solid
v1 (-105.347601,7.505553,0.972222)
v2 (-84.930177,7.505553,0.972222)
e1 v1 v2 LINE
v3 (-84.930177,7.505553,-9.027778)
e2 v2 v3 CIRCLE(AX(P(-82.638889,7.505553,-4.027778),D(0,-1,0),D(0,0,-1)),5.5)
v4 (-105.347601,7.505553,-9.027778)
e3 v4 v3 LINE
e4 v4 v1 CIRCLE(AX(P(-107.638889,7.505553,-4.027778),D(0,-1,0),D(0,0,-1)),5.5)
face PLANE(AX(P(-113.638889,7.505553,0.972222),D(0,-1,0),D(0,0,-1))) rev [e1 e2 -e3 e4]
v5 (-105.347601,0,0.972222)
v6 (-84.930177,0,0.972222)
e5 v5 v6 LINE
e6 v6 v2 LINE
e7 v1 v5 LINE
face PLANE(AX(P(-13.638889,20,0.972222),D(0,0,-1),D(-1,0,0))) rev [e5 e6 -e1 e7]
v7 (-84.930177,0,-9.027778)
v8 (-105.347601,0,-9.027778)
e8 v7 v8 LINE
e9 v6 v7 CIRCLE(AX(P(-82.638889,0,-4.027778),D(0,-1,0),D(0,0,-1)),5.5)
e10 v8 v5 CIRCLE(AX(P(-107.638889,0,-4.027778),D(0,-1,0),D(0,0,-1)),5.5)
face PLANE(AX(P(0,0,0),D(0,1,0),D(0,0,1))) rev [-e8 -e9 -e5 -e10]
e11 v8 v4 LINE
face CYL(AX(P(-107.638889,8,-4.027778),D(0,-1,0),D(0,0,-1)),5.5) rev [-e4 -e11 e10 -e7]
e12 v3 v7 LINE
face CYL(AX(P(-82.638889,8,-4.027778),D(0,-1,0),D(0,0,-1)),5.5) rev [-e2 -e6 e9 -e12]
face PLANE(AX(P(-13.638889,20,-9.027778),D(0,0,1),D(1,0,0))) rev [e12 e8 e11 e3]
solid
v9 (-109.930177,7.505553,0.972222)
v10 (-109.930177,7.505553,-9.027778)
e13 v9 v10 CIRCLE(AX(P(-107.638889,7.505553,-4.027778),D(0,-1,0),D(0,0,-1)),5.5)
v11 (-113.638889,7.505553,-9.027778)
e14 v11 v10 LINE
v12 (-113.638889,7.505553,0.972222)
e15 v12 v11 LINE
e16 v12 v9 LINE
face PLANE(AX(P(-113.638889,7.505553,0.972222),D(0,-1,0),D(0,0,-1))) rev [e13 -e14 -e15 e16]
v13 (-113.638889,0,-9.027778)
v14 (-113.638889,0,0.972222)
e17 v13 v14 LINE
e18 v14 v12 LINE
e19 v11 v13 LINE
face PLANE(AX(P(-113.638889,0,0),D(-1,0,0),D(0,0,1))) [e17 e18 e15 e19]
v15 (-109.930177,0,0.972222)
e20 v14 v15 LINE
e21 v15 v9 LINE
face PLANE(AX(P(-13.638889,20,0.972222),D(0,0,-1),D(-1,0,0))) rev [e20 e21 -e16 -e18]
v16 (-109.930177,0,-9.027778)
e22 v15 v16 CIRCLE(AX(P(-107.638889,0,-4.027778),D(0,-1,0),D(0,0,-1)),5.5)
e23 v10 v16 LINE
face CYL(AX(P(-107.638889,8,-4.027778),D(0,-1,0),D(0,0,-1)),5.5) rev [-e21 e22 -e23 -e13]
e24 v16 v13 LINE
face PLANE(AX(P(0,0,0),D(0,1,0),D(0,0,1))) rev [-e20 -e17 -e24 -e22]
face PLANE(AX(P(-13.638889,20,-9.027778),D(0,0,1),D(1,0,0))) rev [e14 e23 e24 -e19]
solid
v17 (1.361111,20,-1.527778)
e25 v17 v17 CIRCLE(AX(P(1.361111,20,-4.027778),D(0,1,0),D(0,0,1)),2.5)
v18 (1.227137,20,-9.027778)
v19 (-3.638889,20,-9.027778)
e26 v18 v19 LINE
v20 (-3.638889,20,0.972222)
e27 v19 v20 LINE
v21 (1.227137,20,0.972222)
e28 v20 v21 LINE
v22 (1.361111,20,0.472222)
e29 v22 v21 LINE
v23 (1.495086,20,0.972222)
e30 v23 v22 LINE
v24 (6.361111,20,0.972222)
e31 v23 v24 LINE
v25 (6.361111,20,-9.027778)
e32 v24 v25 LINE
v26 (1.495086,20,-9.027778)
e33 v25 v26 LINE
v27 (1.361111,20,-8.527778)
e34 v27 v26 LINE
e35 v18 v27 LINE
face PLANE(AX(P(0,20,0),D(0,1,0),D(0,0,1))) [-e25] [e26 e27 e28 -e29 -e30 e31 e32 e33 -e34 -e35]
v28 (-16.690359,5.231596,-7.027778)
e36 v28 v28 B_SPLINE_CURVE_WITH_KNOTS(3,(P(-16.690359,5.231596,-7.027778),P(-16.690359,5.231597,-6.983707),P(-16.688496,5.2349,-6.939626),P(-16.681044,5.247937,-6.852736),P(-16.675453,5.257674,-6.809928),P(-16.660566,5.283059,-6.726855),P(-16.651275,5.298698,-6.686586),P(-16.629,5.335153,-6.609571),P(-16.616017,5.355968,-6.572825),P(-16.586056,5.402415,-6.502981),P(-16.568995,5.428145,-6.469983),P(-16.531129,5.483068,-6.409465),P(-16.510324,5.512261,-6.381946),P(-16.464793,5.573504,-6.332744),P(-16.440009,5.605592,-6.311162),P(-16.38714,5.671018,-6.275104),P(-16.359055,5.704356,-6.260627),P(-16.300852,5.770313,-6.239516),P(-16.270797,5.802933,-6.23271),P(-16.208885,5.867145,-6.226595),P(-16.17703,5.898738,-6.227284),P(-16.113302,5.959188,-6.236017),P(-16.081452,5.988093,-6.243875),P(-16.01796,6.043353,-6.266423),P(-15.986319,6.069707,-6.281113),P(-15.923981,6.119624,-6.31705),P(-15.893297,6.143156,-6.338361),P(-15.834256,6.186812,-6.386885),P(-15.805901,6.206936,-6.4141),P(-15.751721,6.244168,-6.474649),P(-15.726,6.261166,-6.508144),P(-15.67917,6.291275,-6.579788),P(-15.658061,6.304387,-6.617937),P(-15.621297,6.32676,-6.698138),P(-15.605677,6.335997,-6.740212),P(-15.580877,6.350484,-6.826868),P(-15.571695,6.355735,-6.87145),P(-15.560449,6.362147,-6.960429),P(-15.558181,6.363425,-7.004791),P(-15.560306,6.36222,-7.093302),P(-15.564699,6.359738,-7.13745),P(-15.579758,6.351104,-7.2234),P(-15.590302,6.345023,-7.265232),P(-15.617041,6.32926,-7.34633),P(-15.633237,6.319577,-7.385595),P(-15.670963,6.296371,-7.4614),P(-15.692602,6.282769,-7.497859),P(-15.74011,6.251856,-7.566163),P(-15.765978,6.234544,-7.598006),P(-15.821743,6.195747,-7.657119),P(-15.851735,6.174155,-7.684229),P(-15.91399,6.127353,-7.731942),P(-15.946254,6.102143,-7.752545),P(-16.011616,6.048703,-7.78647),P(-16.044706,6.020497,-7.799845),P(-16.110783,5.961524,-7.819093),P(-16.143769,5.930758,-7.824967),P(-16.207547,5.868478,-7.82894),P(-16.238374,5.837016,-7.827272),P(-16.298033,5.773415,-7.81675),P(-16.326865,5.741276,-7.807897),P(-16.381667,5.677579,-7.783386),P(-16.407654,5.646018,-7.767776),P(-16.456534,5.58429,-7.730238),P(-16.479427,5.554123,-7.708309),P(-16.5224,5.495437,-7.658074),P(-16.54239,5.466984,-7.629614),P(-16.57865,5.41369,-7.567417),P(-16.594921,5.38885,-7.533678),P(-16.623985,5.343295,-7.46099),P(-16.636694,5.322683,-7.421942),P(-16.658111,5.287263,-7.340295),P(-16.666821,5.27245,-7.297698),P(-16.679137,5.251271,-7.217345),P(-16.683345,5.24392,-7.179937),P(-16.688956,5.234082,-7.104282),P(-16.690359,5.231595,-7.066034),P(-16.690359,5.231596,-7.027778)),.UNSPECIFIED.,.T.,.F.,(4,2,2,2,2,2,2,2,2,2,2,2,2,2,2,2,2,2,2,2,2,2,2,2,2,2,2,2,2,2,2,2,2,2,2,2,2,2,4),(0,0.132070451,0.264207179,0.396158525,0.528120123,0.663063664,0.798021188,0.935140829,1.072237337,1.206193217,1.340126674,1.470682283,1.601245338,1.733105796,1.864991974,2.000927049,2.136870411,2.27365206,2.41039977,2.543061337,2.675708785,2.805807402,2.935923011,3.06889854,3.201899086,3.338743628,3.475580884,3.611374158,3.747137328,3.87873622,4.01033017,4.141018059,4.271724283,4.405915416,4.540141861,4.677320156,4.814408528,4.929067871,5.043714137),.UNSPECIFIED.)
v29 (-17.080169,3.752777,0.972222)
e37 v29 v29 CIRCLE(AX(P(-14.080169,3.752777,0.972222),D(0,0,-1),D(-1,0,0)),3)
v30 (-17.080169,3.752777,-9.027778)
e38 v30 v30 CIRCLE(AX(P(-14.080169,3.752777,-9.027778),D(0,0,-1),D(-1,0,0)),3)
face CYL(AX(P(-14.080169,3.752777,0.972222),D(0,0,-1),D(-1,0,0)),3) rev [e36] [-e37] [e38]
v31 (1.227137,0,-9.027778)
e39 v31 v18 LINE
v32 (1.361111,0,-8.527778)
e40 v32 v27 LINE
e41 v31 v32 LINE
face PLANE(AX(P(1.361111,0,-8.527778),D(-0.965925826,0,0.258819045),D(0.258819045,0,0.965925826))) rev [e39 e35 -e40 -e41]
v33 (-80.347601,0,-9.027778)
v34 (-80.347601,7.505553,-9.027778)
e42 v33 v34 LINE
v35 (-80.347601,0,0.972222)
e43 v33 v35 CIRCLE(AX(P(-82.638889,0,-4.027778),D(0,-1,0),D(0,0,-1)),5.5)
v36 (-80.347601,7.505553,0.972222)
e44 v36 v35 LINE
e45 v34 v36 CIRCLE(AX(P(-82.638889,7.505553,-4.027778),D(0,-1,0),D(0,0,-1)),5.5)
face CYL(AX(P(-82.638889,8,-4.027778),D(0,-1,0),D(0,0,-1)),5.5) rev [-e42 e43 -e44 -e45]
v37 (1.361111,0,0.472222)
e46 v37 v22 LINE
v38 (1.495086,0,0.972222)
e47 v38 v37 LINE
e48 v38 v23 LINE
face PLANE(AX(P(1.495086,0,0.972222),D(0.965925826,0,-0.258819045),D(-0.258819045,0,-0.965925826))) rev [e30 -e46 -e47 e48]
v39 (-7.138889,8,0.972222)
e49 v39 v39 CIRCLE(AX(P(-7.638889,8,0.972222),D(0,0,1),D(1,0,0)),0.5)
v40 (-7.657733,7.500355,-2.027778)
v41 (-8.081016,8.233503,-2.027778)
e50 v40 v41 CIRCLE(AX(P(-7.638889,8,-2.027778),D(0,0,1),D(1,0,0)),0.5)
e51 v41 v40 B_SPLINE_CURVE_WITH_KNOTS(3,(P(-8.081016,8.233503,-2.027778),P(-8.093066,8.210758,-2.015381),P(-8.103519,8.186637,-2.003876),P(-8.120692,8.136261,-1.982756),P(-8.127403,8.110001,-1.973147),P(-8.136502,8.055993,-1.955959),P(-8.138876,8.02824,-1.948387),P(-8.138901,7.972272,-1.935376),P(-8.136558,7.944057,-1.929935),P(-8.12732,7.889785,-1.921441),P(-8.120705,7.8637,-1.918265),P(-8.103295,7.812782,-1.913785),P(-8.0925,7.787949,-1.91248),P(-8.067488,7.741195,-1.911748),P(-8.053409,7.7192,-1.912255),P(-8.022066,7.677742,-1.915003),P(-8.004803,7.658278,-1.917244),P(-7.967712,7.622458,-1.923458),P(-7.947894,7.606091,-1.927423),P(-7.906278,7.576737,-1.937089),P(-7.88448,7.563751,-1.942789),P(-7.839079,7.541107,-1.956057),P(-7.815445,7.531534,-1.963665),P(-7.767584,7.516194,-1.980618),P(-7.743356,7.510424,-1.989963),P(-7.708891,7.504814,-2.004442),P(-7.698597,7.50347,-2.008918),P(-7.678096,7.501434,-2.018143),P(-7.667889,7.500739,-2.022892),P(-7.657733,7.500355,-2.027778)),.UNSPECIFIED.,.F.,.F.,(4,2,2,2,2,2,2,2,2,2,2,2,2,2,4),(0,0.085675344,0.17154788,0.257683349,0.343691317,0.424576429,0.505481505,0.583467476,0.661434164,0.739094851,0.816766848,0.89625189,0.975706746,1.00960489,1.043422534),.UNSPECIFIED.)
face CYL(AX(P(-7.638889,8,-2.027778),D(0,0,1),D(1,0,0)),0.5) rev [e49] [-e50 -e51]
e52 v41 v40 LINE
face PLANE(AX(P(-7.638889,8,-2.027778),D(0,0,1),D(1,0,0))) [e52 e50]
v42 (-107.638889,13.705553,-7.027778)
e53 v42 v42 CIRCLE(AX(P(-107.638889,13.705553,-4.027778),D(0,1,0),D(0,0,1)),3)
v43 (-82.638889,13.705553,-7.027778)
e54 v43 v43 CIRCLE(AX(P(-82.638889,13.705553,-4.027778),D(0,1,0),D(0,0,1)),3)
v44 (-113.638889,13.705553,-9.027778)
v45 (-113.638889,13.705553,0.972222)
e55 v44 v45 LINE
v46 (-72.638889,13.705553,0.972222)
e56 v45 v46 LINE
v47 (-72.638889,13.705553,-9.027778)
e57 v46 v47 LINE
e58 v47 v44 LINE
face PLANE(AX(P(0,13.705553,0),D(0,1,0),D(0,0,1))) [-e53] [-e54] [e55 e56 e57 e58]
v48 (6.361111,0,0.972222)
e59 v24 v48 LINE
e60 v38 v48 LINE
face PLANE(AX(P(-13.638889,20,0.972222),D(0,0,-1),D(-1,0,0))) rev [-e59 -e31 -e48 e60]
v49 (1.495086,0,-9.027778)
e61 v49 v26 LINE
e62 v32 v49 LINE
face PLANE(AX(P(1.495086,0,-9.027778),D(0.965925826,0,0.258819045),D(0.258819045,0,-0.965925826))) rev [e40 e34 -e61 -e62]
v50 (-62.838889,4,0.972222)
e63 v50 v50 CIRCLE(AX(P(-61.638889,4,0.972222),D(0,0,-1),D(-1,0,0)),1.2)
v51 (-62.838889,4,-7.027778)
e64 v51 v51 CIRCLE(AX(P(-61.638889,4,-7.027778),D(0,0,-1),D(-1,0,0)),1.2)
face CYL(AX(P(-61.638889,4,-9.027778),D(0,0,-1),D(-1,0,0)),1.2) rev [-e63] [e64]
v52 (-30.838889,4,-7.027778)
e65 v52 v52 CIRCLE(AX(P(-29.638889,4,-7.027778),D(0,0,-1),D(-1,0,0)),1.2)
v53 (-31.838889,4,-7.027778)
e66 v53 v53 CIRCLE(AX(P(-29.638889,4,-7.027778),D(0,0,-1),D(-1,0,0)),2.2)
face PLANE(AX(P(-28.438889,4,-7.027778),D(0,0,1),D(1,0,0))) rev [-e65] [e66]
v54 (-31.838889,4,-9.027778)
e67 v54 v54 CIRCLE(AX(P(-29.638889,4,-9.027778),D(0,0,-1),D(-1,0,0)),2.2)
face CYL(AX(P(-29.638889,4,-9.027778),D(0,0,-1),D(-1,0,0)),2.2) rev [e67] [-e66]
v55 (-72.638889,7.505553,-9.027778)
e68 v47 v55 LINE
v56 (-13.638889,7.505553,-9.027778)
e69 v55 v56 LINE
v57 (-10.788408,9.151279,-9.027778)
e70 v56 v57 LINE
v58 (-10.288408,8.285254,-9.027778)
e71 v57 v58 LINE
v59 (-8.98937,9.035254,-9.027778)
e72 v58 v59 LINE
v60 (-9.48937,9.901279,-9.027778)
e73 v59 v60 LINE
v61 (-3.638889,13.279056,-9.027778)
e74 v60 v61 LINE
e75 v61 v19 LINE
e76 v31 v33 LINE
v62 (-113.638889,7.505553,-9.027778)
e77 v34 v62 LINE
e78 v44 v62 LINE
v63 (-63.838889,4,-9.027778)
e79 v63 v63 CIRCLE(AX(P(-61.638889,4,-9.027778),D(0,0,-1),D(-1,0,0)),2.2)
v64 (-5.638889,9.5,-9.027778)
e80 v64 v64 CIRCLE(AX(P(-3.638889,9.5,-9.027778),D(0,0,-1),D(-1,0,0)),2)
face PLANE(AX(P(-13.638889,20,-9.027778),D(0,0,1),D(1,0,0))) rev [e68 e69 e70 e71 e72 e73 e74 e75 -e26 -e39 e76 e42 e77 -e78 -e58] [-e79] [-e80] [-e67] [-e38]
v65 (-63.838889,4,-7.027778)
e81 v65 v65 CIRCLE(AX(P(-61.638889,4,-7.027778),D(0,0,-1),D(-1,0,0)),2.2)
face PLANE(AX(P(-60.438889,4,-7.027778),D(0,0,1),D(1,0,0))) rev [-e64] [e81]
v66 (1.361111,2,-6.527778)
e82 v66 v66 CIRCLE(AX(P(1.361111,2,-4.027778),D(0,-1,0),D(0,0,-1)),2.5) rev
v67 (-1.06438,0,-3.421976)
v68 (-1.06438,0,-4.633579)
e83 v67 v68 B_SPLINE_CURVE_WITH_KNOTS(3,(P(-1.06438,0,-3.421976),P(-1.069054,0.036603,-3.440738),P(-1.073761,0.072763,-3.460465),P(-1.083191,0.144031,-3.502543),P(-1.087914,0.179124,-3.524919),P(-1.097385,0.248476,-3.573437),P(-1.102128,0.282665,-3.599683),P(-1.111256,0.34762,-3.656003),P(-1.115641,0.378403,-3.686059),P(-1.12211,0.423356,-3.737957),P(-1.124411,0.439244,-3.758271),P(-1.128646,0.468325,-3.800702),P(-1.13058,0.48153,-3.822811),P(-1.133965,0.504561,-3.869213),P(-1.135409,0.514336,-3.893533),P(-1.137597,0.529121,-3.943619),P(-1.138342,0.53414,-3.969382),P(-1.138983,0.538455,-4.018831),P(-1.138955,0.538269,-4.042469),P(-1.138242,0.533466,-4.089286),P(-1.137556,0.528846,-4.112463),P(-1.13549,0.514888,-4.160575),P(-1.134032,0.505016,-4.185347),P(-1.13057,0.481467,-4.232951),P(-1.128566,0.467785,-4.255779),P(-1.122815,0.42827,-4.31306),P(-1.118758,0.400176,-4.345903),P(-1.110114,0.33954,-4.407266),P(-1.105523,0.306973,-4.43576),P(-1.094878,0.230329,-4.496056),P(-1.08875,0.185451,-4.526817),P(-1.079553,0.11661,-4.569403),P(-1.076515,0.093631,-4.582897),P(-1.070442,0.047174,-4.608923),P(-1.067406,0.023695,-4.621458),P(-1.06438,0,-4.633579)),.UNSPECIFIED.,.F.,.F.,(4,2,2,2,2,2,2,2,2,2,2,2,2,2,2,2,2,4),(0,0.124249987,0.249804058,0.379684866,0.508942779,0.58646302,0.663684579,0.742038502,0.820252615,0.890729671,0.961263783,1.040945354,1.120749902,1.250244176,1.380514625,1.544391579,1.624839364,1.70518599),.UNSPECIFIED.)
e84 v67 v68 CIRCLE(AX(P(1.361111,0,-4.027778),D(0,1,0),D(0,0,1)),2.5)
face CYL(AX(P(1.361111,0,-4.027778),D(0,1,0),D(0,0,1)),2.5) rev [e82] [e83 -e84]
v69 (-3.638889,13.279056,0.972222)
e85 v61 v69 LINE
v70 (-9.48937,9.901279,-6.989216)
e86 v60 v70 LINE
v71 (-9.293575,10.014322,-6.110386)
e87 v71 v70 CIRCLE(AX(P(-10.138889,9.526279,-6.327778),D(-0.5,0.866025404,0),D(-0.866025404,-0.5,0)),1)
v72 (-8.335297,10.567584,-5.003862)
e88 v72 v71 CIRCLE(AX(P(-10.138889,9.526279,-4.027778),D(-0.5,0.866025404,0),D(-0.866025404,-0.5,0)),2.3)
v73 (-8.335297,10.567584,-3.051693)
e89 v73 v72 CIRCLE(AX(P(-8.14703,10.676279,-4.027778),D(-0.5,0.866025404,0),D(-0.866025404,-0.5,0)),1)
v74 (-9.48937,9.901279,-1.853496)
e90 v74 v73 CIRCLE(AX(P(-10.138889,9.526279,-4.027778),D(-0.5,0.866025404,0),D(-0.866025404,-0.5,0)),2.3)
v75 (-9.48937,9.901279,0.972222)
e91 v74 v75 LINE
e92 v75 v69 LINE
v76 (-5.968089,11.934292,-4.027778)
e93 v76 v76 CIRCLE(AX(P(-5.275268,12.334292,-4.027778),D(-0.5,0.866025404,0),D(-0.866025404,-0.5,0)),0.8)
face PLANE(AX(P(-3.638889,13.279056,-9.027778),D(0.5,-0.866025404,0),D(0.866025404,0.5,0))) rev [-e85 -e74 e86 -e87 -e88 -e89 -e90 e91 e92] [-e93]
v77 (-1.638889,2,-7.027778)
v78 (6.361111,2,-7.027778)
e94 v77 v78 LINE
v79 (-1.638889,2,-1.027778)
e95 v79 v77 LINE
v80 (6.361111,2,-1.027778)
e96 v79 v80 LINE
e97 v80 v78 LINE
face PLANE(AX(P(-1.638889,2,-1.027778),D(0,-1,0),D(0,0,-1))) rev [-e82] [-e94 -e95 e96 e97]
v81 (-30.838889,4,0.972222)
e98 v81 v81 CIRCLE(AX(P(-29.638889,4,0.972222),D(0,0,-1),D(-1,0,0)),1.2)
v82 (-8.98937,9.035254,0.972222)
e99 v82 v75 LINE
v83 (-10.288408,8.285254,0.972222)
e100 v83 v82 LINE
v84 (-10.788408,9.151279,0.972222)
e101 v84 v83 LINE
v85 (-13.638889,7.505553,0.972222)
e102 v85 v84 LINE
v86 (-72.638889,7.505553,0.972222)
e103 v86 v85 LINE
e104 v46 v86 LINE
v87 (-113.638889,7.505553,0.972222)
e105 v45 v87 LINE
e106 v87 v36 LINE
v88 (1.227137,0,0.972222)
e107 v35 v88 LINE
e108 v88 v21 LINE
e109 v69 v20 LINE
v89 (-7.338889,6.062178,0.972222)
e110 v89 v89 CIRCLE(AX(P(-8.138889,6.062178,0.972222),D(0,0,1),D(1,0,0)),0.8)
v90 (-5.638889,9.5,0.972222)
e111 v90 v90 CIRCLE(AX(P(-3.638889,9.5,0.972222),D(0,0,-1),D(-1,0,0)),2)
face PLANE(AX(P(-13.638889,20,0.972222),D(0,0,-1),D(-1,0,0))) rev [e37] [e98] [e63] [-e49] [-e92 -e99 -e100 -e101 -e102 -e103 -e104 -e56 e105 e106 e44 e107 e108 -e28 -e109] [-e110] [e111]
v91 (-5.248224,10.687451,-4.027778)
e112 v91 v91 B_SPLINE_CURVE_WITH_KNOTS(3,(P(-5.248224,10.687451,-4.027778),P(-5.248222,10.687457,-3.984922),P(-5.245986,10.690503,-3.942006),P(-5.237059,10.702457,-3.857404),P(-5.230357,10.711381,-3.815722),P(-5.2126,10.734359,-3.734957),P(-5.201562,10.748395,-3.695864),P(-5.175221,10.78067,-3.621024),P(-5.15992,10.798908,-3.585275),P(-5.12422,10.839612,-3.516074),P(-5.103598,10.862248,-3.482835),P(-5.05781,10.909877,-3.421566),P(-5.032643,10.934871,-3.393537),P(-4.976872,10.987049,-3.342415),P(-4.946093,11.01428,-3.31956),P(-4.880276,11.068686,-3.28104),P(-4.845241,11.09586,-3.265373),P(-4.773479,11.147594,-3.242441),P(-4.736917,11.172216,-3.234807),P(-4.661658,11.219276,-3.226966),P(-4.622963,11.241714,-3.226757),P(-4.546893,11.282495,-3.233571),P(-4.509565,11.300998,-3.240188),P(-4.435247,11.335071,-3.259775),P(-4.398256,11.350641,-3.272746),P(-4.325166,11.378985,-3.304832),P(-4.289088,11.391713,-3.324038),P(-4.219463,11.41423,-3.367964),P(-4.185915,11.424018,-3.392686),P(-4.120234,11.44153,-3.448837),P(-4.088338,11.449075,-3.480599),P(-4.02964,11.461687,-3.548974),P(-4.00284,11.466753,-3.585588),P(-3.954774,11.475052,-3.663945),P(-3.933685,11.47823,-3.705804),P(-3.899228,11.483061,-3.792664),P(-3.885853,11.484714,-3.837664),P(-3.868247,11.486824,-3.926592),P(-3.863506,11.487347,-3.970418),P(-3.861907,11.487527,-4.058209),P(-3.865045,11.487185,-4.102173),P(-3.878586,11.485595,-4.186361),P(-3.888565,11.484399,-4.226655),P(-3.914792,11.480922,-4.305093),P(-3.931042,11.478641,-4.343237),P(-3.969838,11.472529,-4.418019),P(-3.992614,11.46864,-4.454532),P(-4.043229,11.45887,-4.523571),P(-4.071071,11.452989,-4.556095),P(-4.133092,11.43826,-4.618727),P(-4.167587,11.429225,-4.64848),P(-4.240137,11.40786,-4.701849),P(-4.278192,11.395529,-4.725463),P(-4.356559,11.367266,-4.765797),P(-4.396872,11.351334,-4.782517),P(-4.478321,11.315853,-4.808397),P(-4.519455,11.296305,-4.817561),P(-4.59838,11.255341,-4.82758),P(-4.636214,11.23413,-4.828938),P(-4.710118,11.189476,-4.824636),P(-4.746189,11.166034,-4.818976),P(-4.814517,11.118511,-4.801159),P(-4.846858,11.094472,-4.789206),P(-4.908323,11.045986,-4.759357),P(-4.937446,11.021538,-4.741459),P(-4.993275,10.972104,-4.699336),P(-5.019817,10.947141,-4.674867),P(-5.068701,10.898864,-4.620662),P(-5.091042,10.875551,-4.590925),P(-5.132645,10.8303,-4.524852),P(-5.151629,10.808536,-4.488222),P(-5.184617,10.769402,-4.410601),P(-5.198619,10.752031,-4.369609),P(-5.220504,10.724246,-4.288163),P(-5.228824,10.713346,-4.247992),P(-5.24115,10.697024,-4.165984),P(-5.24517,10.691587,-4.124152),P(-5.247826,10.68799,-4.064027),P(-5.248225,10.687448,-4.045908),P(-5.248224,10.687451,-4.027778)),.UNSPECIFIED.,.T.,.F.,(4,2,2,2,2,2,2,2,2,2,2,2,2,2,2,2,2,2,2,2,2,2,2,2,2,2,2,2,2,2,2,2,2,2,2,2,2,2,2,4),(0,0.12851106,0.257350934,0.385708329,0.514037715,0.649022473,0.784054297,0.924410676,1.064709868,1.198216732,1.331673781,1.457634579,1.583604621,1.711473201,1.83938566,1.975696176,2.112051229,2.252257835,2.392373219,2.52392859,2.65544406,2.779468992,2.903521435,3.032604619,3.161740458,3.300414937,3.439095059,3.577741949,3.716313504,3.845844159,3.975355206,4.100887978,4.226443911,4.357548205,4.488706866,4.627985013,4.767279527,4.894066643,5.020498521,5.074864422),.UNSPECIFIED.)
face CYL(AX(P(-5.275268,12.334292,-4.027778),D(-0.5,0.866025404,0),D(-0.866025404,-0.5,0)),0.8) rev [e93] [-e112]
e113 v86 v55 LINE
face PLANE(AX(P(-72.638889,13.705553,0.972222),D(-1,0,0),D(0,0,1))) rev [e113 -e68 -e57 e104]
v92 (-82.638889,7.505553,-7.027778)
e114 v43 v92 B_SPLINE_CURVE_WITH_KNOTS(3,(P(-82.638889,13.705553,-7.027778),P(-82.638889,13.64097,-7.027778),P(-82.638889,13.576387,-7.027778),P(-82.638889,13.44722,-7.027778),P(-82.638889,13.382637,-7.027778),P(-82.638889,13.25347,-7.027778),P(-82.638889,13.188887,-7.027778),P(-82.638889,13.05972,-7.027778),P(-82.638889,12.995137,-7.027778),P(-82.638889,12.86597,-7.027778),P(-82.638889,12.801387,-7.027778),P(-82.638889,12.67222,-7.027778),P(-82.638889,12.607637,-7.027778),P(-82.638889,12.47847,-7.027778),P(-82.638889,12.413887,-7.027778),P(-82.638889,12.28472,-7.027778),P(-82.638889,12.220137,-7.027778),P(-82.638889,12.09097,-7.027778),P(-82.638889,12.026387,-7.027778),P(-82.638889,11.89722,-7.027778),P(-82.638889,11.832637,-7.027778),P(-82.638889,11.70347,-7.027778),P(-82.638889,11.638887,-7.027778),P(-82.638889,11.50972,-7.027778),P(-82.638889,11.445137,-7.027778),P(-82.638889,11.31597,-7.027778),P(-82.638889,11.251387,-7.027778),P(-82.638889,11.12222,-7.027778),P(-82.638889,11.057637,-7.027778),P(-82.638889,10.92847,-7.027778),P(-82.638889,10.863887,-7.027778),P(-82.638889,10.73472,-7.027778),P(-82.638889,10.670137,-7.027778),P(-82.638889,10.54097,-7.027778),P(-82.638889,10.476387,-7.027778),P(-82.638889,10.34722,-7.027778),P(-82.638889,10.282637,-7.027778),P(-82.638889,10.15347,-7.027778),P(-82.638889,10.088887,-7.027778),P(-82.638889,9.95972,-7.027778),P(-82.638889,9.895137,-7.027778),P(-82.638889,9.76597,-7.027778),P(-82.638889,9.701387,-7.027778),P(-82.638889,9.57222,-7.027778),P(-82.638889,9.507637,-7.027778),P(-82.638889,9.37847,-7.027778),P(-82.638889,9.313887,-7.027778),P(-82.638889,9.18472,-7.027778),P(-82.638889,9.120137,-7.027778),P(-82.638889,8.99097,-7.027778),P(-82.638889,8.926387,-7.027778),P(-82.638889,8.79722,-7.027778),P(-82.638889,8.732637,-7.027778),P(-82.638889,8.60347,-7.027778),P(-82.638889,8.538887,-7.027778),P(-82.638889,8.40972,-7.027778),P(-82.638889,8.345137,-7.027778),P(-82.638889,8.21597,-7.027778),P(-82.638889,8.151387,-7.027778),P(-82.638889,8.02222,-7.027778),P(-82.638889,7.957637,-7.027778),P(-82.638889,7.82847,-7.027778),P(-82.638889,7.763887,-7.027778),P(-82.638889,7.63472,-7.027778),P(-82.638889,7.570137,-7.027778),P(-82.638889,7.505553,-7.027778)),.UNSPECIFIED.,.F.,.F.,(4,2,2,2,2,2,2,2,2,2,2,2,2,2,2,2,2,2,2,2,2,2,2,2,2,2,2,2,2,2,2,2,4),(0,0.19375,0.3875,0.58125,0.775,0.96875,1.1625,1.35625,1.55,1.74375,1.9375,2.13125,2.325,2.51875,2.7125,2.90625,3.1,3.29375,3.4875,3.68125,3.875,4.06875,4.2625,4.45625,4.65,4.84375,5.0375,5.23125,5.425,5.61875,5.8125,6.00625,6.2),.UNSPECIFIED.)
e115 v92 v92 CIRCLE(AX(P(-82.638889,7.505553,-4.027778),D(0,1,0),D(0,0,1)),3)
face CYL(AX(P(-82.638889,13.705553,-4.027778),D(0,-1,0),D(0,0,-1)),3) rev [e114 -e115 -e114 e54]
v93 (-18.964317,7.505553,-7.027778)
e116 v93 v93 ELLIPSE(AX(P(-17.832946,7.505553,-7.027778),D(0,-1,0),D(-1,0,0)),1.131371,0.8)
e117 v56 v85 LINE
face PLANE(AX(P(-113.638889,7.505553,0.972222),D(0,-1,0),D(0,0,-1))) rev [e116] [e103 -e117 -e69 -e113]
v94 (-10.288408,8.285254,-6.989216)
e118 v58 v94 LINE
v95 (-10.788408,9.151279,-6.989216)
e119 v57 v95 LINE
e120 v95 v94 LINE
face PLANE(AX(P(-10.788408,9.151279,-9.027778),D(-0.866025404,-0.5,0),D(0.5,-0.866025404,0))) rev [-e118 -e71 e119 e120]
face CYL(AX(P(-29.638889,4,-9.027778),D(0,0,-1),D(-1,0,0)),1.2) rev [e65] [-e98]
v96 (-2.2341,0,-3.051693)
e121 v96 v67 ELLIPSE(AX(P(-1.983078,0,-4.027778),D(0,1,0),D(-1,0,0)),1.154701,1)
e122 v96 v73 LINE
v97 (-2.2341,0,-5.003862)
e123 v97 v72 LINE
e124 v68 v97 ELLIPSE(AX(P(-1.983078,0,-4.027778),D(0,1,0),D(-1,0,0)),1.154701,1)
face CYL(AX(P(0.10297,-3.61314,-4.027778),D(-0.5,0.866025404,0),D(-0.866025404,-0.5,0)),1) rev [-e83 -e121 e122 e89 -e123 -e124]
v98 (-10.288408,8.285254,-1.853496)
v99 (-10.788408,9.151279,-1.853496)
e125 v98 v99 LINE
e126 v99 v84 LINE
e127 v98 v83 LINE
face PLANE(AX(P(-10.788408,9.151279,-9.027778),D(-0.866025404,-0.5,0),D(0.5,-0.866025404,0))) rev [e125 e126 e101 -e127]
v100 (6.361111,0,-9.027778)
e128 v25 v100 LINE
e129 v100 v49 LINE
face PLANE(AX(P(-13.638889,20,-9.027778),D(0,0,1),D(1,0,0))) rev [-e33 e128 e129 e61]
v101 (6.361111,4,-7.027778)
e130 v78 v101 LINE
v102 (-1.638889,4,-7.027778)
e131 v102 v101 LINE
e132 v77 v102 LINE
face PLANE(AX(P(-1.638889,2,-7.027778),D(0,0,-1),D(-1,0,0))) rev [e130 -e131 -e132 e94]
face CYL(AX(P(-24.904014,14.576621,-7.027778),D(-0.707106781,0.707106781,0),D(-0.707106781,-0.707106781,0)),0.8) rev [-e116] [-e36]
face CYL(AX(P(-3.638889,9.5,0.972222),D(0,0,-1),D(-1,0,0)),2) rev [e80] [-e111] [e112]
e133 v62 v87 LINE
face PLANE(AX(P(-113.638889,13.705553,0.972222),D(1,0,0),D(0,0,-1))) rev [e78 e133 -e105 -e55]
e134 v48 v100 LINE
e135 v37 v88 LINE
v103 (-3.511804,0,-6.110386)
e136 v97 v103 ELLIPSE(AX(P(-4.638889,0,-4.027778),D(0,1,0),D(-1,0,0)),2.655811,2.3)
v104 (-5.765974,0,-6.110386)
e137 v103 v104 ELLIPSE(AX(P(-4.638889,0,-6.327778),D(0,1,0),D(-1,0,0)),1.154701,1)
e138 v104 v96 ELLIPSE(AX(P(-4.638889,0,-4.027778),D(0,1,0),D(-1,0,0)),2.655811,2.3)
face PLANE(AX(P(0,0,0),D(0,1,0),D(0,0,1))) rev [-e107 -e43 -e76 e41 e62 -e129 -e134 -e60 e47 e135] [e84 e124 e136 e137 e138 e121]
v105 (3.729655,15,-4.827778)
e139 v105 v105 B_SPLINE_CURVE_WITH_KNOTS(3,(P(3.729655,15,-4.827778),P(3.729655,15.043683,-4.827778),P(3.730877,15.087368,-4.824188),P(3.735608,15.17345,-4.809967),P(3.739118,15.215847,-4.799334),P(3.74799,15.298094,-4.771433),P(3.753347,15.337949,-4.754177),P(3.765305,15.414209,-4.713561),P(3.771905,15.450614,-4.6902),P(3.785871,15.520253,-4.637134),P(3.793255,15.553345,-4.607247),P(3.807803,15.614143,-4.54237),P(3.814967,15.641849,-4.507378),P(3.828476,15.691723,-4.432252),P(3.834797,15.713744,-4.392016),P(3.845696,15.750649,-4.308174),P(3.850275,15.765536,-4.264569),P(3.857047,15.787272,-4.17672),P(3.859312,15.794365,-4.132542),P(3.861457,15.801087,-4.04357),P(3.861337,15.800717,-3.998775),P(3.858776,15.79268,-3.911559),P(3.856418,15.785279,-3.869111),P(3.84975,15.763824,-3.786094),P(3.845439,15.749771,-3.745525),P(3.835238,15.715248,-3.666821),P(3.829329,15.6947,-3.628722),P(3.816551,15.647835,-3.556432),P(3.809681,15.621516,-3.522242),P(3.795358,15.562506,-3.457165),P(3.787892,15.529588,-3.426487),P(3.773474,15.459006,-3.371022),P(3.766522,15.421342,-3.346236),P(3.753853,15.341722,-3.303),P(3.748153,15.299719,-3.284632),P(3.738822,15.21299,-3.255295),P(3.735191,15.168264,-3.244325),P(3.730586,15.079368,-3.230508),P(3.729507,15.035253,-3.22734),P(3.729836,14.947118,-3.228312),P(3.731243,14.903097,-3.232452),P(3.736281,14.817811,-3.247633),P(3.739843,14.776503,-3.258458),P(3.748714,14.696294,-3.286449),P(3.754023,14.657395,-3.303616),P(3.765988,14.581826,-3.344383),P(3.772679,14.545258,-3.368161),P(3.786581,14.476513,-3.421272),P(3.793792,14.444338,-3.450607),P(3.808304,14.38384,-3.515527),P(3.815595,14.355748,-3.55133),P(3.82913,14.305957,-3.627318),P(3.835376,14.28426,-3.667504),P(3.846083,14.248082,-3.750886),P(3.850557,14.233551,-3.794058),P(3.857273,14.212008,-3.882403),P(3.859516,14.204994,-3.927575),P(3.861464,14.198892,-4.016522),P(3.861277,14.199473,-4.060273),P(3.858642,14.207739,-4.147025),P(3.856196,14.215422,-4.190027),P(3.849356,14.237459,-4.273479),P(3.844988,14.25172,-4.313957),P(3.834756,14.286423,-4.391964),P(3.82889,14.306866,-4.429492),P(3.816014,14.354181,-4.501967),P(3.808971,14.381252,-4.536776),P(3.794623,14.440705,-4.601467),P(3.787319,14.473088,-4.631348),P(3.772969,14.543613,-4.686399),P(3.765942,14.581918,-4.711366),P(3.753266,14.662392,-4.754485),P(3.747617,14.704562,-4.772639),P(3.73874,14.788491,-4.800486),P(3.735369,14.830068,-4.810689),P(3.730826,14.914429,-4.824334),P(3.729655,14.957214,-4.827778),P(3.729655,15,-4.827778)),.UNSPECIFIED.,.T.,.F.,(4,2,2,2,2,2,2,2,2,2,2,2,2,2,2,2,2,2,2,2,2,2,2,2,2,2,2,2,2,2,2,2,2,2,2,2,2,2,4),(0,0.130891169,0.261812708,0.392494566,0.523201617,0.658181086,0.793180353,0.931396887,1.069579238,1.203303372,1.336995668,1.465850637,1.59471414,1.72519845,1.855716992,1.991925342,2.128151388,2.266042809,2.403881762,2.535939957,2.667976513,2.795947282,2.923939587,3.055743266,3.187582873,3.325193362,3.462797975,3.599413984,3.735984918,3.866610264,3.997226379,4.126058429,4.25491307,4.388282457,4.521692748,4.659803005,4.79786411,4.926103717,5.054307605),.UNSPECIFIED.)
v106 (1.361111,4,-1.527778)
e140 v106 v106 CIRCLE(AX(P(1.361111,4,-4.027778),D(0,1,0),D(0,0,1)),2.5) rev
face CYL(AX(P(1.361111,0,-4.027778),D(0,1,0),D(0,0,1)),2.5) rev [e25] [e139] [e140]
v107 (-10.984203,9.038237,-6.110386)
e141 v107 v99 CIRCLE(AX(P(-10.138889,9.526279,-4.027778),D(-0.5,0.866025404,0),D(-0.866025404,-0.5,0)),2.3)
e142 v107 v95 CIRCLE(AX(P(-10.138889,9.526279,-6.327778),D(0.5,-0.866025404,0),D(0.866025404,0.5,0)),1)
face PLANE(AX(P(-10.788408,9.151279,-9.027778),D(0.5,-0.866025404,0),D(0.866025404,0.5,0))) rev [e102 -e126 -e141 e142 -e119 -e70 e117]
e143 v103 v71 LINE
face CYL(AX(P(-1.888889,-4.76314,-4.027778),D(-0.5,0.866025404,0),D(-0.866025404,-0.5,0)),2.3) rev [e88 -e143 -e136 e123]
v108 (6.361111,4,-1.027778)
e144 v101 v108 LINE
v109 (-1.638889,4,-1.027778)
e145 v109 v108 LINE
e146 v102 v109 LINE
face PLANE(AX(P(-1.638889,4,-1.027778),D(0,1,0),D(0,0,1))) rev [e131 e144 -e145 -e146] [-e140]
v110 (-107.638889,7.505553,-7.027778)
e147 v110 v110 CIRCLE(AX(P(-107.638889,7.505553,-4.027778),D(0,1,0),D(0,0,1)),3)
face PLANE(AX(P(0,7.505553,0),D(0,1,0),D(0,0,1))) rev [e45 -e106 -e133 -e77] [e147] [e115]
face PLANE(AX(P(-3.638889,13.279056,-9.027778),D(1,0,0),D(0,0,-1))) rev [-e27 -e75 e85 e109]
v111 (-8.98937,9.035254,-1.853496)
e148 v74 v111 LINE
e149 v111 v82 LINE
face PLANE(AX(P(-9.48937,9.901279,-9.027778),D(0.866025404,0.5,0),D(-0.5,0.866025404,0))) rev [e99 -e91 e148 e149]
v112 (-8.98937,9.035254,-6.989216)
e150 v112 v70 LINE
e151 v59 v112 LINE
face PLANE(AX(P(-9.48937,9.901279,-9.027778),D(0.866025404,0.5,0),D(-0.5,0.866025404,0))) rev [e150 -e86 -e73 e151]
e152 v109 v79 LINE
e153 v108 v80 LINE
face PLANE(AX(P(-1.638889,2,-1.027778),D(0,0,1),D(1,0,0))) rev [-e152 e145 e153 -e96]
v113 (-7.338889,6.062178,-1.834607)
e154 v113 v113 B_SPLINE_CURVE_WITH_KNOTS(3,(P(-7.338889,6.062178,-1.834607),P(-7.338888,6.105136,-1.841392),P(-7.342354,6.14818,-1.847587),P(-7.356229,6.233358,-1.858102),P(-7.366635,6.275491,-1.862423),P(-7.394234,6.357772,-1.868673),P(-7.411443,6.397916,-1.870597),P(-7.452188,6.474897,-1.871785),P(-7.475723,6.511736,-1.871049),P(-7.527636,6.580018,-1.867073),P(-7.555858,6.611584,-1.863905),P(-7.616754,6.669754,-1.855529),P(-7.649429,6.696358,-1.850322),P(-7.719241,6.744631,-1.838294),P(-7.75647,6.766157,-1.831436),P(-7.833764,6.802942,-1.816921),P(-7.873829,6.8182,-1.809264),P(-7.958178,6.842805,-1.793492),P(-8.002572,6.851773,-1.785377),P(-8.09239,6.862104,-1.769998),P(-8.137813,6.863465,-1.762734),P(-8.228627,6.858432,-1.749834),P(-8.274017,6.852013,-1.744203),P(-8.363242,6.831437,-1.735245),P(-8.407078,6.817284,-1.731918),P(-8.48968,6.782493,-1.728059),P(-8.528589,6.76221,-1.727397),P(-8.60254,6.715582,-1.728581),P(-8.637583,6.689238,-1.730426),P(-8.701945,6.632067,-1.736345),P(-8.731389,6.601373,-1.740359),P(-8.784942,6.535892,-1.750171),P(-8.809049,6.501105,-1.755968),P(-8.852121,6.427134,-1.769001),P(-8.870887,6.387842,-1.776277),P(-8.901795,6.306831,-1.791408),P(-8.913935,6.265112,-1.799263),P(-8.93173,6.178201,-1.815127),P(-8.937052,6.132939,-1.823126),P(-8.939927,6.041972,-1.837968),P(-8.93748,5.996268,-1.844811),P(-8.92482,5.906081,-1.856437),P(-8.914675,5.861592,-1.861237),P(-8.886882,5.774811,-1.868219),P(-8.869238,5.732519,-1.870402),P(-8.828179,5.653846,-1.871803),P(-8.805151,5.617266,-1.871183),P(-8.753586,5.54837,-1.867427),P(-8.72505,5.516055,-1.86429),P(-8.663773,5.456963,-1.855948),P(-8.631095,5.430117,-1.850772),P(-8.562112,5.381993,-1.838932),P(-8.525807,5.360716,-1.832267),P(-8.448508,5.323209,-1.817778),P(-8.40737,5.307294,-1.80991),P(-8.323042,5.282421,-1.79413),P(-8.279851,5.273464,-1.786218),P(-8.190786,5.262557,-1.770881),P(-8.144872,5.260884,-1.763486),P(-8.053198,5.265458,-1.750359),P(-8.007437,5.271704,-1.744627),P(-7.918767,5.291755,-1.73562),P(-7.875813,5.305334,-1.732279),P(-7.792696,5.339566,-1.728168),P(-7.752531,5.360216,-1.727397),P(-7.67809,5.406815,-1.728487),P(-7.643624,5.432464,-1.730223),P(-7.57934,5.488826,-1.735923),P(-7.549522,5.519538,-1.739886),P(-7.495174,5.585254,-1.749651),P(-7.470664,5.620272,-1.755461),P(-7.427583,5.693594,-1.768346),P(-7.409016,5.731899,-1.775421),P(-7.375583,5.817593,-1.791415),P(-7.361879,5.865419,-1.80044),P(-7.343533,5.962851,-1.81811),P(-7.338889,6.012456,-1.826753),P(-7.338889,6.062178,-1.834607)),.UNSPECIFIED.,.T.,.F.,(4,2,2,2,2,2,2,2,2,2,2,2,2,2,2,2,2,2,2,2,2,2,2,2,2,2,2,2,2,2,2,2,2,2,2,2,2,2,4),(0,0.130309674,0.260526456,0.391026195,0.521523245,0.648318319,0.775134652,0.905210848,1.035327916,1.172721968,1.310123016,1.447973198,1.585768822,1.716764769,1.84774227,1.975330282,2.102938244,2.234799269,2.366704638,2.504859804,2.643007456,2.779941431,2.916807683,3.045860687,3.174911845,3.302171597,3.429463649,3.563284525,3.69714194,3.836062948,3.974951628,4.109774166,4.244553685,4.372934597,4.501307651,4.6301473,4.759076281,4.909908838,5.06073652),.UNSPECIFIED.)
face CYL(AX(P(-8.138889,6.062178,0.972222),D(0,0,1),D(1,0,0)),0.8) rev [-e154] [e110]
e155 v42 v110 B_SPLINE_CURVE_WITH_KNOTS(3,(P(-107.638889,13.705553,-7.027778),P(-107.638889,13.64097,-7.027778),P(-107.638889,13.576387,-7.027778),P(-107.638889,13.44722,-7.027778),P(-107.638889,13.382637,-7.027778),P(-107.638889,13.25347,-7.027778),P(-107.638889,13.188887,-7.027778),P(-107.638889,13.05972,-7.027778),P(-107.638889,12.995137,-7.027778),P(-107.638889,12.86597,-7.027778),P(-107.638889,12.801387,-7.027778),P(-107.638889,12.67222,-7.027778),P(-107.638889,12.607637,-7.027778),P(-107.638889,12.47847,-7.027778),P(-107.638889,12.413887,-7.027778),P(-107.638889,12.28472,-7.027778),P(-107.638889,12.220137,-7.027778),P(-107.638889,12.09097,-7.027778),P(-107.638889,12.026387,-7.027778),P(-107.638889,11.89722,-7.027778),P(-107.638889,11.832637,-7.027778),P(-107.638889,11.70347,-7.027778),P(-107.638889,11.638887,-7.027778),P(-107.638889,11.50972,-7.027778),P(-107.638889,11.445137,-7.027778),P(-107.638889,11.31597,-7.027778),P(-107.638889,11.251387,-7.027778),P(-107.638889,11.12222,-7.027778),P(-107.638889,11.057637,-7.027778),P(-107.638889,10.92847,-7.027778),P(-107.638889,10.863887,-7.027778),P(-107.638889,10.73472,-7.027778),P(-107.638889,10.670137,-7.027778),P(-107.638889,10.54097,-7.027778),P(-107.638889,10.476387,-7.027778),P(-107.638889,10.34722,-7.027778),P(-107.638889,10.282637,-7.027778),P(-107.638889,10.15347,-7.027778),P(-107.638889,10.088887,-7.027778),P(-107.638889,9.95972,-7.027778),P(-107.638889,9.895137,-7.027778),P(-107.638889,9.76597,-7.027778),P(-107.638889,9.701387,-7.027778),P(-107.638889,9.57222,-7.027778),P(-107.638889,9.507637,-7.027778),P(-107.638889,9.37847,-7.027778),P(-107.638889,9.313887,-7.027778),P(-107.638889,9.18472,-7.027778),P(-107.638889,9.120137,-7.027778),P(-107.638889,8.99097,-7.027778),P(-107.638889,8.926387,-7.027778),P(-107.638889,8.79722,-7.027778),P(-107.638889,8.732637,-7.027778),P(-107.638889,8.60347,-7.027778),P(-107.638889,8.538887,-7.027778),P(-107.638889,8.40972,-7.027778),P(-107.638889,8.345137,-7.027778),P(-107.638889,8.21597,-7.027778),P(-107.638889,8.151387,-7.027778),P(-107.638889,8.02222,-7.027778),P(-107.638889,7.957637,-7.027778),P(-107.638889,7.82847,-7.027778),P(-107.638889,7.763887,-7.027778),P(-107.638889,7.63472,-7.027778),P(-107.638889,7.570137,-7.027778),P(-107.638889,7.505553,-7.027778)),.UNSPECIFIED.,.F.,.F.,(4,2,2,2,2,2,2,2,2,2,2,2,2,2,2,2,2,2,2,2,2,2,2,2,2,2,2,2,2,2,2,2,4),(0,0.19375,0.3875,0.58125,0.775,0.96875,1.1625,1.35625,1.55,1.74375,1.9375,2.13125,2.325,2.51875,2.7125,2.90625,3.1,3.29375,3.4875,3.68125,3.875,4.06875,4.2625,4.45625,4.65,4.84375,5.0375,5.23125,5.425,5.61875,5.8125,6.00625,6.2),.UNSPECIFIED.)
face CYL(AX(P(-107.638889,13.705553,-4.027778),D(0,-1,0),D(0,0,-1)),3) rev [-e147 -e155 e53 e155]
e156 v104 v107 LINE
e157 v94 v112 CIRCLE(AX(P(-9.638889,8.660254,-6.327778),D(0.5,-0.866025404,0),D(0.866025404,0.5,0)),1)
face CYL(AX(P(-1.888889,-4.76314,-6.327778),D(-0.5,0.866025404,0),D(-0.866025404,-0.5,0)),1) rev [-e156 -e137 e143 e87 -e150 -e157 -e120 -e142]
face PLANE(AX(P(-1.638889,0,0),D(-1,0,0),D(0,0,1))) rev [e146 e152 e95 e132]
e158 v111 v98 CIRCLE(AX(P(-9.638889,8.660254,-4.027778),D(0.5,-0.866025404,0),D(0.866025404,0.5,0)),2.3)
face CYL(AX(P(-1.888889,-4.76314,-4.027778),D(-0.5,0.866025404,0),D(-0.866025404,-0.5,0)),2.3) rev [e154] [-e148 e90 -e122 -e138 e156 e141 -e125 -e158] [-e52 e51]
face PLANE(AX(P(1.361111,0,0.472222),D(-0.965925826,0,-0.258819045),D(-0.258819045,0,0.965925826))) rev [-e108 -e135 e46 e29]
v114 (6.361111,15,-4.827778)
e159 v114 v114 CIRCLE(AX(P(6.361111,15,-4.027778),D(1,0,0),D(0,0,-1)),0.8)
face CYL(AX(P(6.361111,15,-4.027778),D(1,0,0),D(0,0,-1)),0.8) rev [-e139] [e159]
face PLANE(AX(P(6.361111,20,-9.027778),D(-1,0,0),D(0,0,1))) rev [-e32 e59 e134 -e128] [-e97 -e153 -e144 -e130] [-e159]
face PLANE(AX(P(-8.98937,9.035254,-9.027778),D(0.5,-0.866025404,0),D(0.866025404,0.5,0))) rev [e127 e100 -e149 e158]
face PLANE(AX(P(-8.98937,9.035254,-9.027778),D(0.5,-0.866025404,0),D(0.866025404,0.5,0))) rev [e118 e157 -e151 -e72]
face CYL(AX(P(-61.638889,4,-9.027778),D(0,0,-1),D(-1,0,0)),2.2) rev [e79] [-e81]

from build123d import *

# Parameters (mm, degrees)
SKETCH1_W                                    = 20
SKETCH1_H                                    = 10
BOSS_EXTRUDE1_DEPTH                          = 20
SKETCH2_R                                    = 2.5
CUT_EXTRUDE1_DEPTH                           = 26.836409614
CUT_EXTRUDE2_DEPTH                           = 27.191969955
CUT_EXTRUDE5_DEPTH                           = 20.59843291
M2X0_4_TAPPED_HOLE1_D                        = 1.6
M2X0_4_TAPPED_HOLE1_DEPTH                    = 6
M2X0_4_TAPPED_HOLE1_TIP                      = 0.480688495
M2X0_4_TAPPED_HOLE2_D                        = 1.6
M2X0_4_TAPPED_HOLE2_DEPTH                    = 6
M2X0_4_TAPPED_HOLE2_TIP                      = 0.480688495
SKETCH14_W                                   = 10
SKETCH14_H                                   = 7.505553499
BOSS_EXTRUDE3_DEPTH                          = 100
CUT_EXTRUDE7_REACH                           = 116.68
SKETCH15_R                                   = 3
SKETCH18_R                                   = 0.5
CUT_EXTRUDE9_DEPTH                           = 3
SKETCH23_R                                   = 5.5
CUT_EXTRUDE10_DEPTH                          = 8
SKETCH24_W                                   = 41
SKETCH24_H                                   = 10
SKETCH24_R                                   = 3
BOSS_EXTRUDE4_DEPTH                          = 6.2
SKETCH27_R                                   = 2
CUT_EXTRUDE11_DEPTH                          = 116.817947978
M2X0_4_TAPPED_HOLE4_OUTLINE_W                = 0.8
M2X0_4_TAPPED_HOLE4_OUTLINE_H                = 1.439804136
SKETCH32_R                                   = 3
CUT_EXTRUDE12_DEPTH                          = 116.817947978
CBORE_FOR_M2_HEX_SOCKET_HEAD_CAP2_AT_2_COUNT = 2
CBORE_FOR_M2_HEX_SOCKET_HEAD_CAP2_AT_2_PITCH = 32
M2X0_4_START                                 = -18.717024707
M2X0_4_TAPPED_HOLE7_OUTLINE_R                = 0.8
M2X0_4_TAPPED_HOLE7_DEPTH                    = 3.215861518
SKETCH48_W                                   = 6
SKETCH48_H                                   = 2
CUT_EXTRUDE14_DEPTH                          = 8


# Read off the part's stored shape, not the designer's step: M2x0.4 Tapped Hole4, M2x0.4 Tapped Hole7
with BuildPart() as part:
    # Sketch1 → Boss-Extrude1 (new body)
    with BuildSketch(Plane(origin=(0, 0, 0), x_dir=(1, 0, 0), z_dir=(0, 1, 0))):
        with Locations((-3.638888889, 4.027777778)):
            Rectangle(SKETCH1_W, SKETCH1_H)
    extrude(amount=BOSS_EXTRUDE1_DEPTH)

    # Sketch2 → Cut-Extrude1 (cut, through all)
    with BuildSketch(Plane(origin=(0, 20, 0), x_dir=(1, 0, 0), z_dir=(0, 1, 0))):
        with Locations(Location((1.361111111, 4.027777778, 0), (0, 0, 270))):
            Circle(SKETCH2_R)
        Polygon((1.495085707, -0.972222222), (1.361111111, -0.472222222), (1.227136515, -0.972222222), align=None)
        Polygon((1.361111111, 8.527777778), (1.227136515, 9.027777778), (1.495085707, 9.027777778), align=None)
    extrude(amount=-CUT_EXTRUDE1_DEPTH, mode=Mode.SUBTRACT)

    # Sketch3 → Cut-Extrude2 (cut, through all)
    with BuildSketch(Plane.XY.offset(0.972222222)):
        Polygon((-13.638888889, 20), (-3.638888889, 20), (-3.638888889, 13.279056191), (-9.489369836, 9.901279442), (-8.989369836, 9.035254038), (-10.288407942, 8.285254038), (-10.788407942, 9.151279442), (-13.638888889, 7.505553499), align=None)
    extrude(amount=-CUT_EXTRUDE2_DEPTH, mode=Mode.SUBTRACT)

    # Sketch5 → Cut-Extrude5 (cut, through all)
    with BuildSketch(Plane(origin=(-6.659722222, 11.534977253, 0), x_dir=(0.8660254037844415, 0.49999999999999534, 0), z_dir=(-0.49999999999999534, 0.8660254037844415, 0))):
        with BuildLine():
            ThreePointArc((-4.993480159, 6.110386473), (-5.64374122, 2.401432181), (-1.934786927, 3.051693242))
            ThreePointArc((-1.934786927, 3.051693242), (-0.717395623, 4.027777778), (-1.934786927, 5.003862313))
            ThreePointArc((-1.934786927, 5.003862313), (-2.391050026, 5.654123375), (-3.041311087, 6.110386473))
            ThreePointArc((-3.041311087, 6.110386473), (-4.017395623, 7.327777778), (-4.993480159, 6.110386473))
        make_face()
    extrude(amount=-CUT_EXTRUDE5_DEPTH, mode=Mode.SUBTRACT)

    # M2x0.4 Tapped Hole1
    with Locations(Plane(origin=(6.361111111, 0, 0), x_dir=(0, 0, -1), z_dir=(1, 0, 0))):
        with Locations((4.027777778, 15)):
            Hole(M2X0_4_TAPPED_HOLE1_D / 2, depth=M2X0_4_TAPPED_HOLE1_DEPTH)
            with Locations((0, 0, -(M2X0_4_TAPPED_HOLE1_DEPTH + M2X0_4_TAPPED_HOLE1_TIP / 2))):  # 118° drill point
                Cone(0, M2X0_4_TAPPED_HOLE1_D / 2, M2X0_4_TAPPED_HOLE1_TIP, mode=Mode.SUBTRACT)

    # M2x0.4 Tapped Hole2
    with Locations(Plane.XY.offset(0.972222222)):
        with Locations((-8.138888889, 6.062177826)):
            Hole(M2X0_4_TAPPED_HOLE2_D / 2, depth=M2X0_4_TAPPED_HOLE2_DEPTH)
            with Locations((0, 0, -(M2X0_4_TAPPED_HOLE2_DEPTH + M2X0_4_TAPPED_HOLE2_TIP / 2))):  # 118° drill point
                Cone(0, M2X0_4_TAPPED_HOLE2_D / 2, M2X0_4_TAPPED_HOLE2_TIP, mode=Mode.SUBTRACT)

    # Sketch14 → Boss-Extrude3 (add)
    with BuildSketch(Plane.ZY.offset(13.638888889)):
        with Locations((-4.027777778, 3.75277675)):
            Rectangle(SKETCH14_W, SKETCH14_H)
    extrude(amount=BOSS_EXTRUDE3_DEPTH)

    # Sketch15 → Cut-Extrude7 (cut, up to next)
    with BuildSketch(Plane(origin=(0, 7.505553499, 0), x_dir=(1, 0, 0), z_dir=(0, 1, 0)), mode=Mode.PRIVATE) as cut_extrude7_sk1:
        with Locations(Location((-107.638888889, 4.027777778, 0), (0, 0, 270))):
            Circle(SKETCH15_R)
    cut_extrude7_tool1 = extrude(cut_extrude7_sk1.sketch, amount=-CUT_EXTRUDE7_REACH, mode=Mode.PRIVATE) & part.part
    # Sketch15 → Cut-Extrude7 (cut, up to next)
    with BuildSketch(Plane(origin=(0, 7.505553499, 0), x_dir=(1, 0, 0), z_dir=(0, 1, 0)), mode=Mode.PRIVATE) as cut_extrude7_sk2:
        with Locations(Location((-82.638888889, 4.027777778, 0), (0, 0, 270))):
            Circle(SKETCH15_R)
    cut_extrude7_tool2 = extrude(cut_extrude7_sk2.sketch, amount=-CUT_EXTRUDE7_REACH, mode=Mode.PRIVATE) & part.part
    add(cut_extrude7_tool1.solids().sort_by_distance((-107.638889, 7.505553, -4.027778))[0], mode=Mode.SUBTRACT)
    add(cut_extrude7_tool2.solids().sort_by_distance((-82.638889, 7.505553, -4.027778))[0], mode=Mode.SUBTRACT)

    # Sketch18 → Cut-Extrude9 (cut)
    with BuildSketch(Plane.XY.offset(0.972222222)):
        with Locations((-7.638888889, 8)):
            Circle(SKETCH18_R)
    extrude(amount=-CUT_EXTRUDE9_DEPTH, mode=Mode.SUBTRACT)

    # Sketch23 → Cut-Extrude10 (cut)
    with BuildSketch(Plane.XZ):
        with Locations((-107.638888889, -4.027777778)):
            Circle(SKETCH23_R)
        with Locations((-82.638888889, -4.027777778)):
            Circle(SKETCH23_R)
    extrude(amount=-CUT_EXTRUDE10_DEPTH, mode=Mode.SUBTRACT)


with BuildPart() as cut_extrude10_piece_1:
    # of the separate pieces the step leaves, piece 1, a body of its own (cut_extrude10_pieces)
    add(part.part.solids().sort_by_distance((1.227136515, 20, -9.027777778))[0])

    # Sketch24 → Boss-Extrude4 (add)
    with BuildSketch(Plane(origin=(0, 7.505553499, 0), x_dir=(1, 0, 0), z_dir=(0, 1, 0))):
        with Locations((-93.138888889, 4.027777778)):
            Rectangle(SKETCH24_W, SKETCH24_H)
        with Locations(Location((-107.638888889, 4.027777778, 0), (0, 0, 90))):
            Circle(SKETCH24_R, mode=Mode.SUBTRACT)
        with Locations(Location((-82.638888889, 4.027777778, 0), (0, 0, 90))):
            Circle(SKETCH24_R, mode=Mode.SUBTRACT)
    extrude(amount=BOSS_EXTRUDE4_DEPTH)

    # Sketch27 → Cut-Extrude11 (cut, through all)
    with BuildSketch(Plane(origin=(0, 0, -9.027777778), x_dir=(-1, 0, 0), z_dir=(0, 0, -1))):
        with Locations((3.638888889, 9.5)):
            Circle(SKETCH27_R)
    extrude(amount=-CUT_EXTRUDE11_DEPTH, mode=Mode.SUBTRACT)

    # M2x0.4 Tapped Hole4 outline → M2x0.4 Tapped Hole4 (revolve, cut)
    with BuildSketch(Plane(origin=(1.384454001, 0.79931489, -4.027777778), x_dir=(0.8660254037844406, 0.4999999999999967, 0), z_dir=(0, 0, -1))):
        with Locations((0.4, -12.599542376)):
            Rectangle(M2X0_4_TAPPED_HOLE4_OUTLINE_W, M2X0_4_TAPPED_HOLE4_OUTLINE_H)
    revolve(axis=Axis((1.384454001, 0.79931489, -4.027777778), (0.4999999999999967, -0.8660254037844406, 0)), mode=Mode.SUBTRACT)

    # Sketch32 → Cut-Extrude12 (cut, through all)
    with BuildSketch(Plane(origin=(0, 0, -9.027777778), x_dir=(-1, 0, 0), z_dir=(0, 0, -1))):
        with Locations((14.080168947, 3.75277675)):
            Circle(SKETCH32_R)
    extrude(amount=-CUT_EXTRUDE12_DEPTH, mode=Mode.SUBTRACT)

    # Sketch41 → CBORE for M2 Hex Socket Head Cap2 (revolve, cut)
    with BuildSketch(Plane(origin=(-61.638888889, 4, -9.027777778), x_dir=(0, 1, 0), z_dir=(1, 0, 0))):
        Polygon((0, 0), (0, 10), (1.2, 10), (1.2, 2), (2.2, 2), (2.2, 0), align=None)
    cbore_for_m2_hex_socket_head_cap2 = revolve(axis=Axis((-61.638888889, 4, -15.377777778), (0, 0, 1)), mode=Mode.SUBTRACT)

    # CBORE for M2 Hex Socket Head Cap2 at 2: CBORE for M2 Hex Socket Head Cap2 ×2
    with Locations(*[(i * CBORE_FOR_M2_HEX_SOCKET_HEAD_CAP2_AT_2_PITCH, 0, 0) for i in range(1, CBORE_FOR_M2_HEX_SOCKET_HEAD_CAP2_AT_2_COUNT)]):
        add(cbore_for_m2_hex_socket_head_cap2, mode=Mode.SUBTRACT)

    # M2x0.4 Tapped Hole7 outline → M2x0.4 Tapped Hole7 (cut)
    with BuildSketch(Plane(origin=(0, 0, 0), x_dir=(0.707106781186549, 0.707106781186546, 0), z_dir=(0.707106781186546, -0.707106781186549, 0)).offset(M2X0_4_START)):
        with Locations((-7.302569055, -7.027777778)):
            Circle(M2X0_4_TAPPED_HOLE7_OUTLINE_R)
    extrude(amount=M2X0_4_TAPPED_HOLE7_DEPTH, mode=Mode.SUBTRACT)

    # Sketch48 → Cut-Extrude14 (cut)
    with BuildSketch(Plane(origin=(6.361111111, 0, 0), x_dir=(0, 0, -1), z_dir=(1, 0, 0))):
        with Locations((4.027777778, 3)):
            Rectangle(SKETCH48_W, SKETCH48_H)
    extrude(amount=-CUT_EXTRUDE14_DEPTH, mode=Mode.SUBTRACT)


with BuildPart() as cut_extrude10_piece_2:
    # of the separate pieces the step leaves, piece 2, a body of its own (cut_extrude10_pieces)
    add(part.part.solids().sort_by_distance((-84.930176736, 7.505553499, -9.027777778))[0])


with BuildPart() as cut_extrude10_piece_3:
    # of the separate pieces the step leaves, piece 3, a body of its own (cut_extrude10_pieces)
    add(part.part.solids().sort_by_distance((-109.930176736, 7.505553499, -9.027777778))[0])


solid = Compound([cut_extrude10_piece_1.part, cut_extrude10_piece_2.part, cut_extrude10_piece_3.part])
